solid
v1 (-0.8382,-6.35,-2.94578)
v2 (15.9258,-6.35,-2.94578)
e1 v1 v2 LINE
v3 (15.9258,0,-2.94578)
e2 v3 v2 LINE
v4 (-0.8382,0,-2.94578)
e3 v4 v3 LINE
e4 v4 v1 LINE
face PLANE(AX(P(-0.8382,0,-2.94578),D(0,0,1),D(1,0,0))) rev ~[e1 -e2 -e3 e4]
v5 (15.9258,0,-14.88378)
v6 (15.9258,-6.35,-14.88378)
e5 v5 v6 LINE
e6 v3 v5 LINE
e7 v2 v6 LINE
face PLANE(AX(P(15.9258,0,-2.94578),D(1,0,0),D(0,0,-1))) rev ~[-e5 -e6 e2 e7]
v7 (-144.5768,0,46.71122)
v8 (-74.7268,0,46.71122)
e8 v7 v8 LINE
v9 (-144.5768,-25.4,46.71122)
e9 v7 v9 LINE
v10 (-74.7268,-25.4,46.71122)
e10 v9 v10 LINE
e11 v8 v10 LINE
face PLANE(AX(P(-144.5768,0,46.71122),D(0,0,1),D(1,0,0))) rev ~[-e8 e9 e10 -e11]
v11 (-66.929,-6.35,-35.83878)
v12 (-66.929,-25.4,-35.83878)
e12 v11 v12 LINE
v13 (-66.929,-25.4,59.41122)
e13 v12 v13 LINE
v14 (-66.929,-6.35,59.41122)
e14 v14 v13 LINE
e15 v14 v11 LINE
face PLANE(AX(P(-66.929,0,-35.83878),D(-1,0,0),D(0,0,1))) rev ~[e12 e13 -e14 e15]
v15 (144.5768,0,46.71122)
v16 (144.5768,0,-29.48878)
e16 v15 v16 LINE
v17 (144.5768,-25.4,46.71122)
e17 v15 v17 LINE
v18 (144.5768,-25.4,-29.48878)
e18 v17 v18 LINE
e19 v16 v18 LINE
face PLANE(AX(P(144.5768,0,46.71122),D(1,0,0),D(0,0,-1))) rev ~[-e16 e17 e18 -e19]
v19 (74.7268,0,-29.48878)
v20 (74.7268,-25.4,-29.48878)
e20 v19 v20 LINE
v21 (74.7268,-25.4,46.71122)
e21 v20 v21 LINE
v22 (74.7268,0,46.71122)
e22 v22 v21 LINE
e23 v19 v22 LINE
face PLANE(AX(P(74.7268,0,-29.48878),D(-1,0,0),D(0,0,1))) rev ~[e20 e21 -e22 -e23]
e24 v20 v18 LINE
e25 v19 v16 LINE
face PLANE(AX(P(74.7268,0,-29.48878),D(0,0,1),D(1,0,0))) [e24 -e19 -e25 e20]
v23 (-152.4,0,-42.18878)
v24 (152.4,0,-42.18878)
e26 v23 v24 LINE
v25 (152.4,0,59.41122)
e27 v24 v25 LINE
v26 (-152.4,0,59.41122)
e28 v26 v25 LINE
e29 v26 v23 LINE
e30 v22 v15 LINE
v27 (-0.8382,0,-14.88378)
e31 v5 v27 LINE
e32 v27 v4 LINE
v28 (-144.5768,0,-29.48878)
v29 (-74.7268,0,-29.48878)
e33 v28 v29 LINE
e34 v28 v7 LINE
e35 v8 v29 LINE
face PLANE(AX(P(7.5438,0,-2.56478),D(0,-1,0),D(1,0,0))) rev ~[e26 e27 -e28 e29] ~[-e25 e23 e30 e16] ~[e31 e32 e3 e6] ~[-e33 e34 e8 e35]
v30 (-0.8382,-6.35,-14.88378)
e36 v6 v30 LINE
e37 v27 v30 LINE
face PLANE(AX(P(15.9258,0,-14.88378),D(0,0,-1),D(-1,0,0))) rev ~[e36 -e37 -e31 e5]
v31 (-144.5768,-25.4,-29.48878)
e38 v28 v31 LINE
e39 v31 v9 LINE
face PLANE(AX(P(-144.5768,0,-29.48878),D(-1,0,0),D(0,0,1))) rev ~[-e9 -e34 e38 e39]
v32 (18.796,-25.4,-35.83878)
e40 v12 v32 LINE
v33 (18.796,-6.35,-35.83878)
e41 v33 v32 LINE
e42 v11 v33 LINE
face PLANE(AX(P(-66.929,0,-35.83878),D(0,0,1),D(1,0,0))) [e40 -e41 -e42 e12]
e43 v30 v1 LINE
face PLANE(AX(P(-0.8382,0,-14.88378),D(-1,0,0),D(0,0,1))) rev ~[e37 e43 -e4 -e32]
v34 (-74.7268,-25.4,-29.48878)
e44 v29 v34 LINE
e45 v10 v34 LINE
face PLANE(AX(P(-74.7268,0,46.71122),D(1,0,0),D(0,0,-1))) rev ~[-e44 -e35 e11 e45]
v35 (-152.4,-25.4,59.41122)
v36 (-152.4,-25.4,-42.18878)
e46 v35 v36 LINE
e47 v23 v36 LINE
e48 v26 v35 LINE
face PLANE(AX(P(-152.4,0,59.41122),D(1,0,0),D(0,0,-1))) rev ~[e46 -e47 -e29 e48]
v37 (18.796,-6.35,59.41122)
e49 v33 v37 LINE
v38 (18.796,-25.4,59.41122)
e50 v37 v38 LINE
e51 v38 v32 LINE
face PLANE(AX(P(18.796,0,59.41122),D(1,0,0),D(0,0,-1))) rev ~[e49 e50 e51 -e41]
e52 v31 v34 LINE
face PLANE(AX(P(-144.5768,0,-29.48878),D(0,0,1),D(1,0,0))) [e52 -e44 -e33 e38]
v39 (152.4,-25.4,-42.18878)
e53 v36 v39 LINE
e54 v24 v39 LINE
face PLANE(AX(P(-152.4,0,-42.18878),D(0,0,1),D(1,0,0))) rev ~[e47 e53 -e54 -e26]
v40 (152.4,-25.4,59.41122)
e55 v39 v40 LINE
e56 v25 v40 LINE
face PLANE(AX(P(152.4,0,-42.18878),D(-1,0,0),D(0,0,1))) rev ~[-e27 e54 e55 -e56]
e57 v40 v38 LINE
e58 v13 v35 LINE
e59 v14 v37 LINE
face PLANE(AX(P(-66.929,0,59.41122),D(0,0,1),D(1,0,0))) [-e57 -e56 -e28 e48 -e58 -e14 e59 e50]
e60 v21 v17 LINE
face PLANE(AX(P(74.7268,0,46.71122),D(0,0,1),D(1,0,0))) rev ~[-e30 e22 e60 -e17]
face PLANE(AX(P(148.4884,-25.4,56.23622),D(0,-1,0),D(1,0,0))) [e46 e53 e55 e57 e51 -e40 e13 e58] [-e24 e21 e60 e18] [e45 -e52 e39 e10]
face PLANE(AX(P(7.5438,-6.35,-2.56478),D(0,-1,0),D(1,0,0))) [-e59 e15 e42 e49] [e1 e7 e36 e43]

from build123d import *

# Parameters (mm, degrees)
F0_W     = 7.8232
F0_H     = 6.35
F0_W_2   = 69.85
F0_W_3   = 55.9308
F0_H_2   = 76.2
F0_W_4   = 7.7978
F0_H_3   = 12.7
F0_W_5   = 85.725
F1_DEPTH = 25.4
F0_W_6   = 16.764
F0_H_4   = 0.762
F0_H_5   = 13.4315382606
F0_W_7   = 66.0908
F0_W_8   = 2.8702
F0_H_6   = 4.9097025247
F0_H_7   = 5.1918955931
F2_DEPTH = 6.35


with BuildPart() as f1:
    # F0 (on Front) → F1 (new body)
    with BuildSketch(Plane.XZ):
        with Locations((148.4884, 56.2362195122)):
            Rectangle(F0_W, F0_H)
        with Locations((109.6518, 56.2362195122)):
            Rectangle(F0_W_2, F0_H)
        with Locations((148.4884, 49.8862195122)):
            Rectangle(F0_W, F0_H)
        with Locations((46.7614, 56.2362195122)):
            Rectangle(F0_W_3, F0_H)
        with Locations((109.6518, 49.8862195122)):
            Rectangle(F0_W_2, F0_H)
        with Locations((148.4884, 8.6112195122)):
            Rectangle(F0_W, F0_H_2)
        with Locations((46.7614, 49.8862195122)):
            Rectangle(F0_W_3, F0_H)
        with Locations((148.4884, -32.6637804878)):
            Rectangle(F0_W, F0_H)
        with Locations((-70.8279, 56.2362195122)):
            Rectangle(F0_W_4, F0_H)
        Polygon((74.7268, -2.1837804878), (74.7268, 46.7112195122), (18.796, 46.7112195122), (18.796, 3.0081151053), (18.796, -2.1837804878), align=None)
        with Locations((109.6518, -32.6637804878)):
            Rectangle(F0_W_2, F0_H)
        with Locations((148.4884, -39.0137804878)):
            Rectangle(F0_W, F0_H)
        with Locations((-109.6518, 56.2362195122)):
            Rectangle(F0_W_2, F0_H)
        with Locations((-70.8279, 49.8862195122)):
            Rectangle(F0_W_4, F0_H)
        with Locations((46.7614, -8.5337804878)):
            Rectangle(F0_W_3, F0_H_3)
        with Locations((109.6518, -39.0137804878)):
            Rectangle(F0_W_2, F0_H)
        Polygon((18.796, -29.4887804878), (74.7268, -29.4887804878), (74.7268, -14.8837804878), (18.796, -14.8837804878), (18.796, -28.3153187484), align=None)
        with Locations((46.7614, -32.6637804878)):
            Rectangle(F0_W_3, F0_H)
        with Locations((-148.4884, 56.2362195122)):
            Rectangle(F0_W, F0_H)
        with Locations((-109.6518, 49.8862195122)):
            Rectangle(F0_W_2, F0_H)
        Polygon((-66.929, 2.7259220369), (-66.929, 46.7112195122), (-74.7268, 46.7112195122), (-74.7268, -2.1837804878), (-66.929, -2.1837804878), align=None)
        with Locations((46.7614, -39.0137804878)):
            Rectangle(F0_W_3, F0_H)
        with Locations((-148.4884, 49.8862195122)):
            Rectangle(F0_W, F0_H)
        with Locations((-24.0665, -39.0137804878)):
            Rectangle(F0_W_5, F0_H)
        Polygon((-74.7268, -29.4887804878), (-66.929, -29.4887804878), (-66.929, -28.3153187484), (-66.929, -14.8837804878), (-74.7268, -14.8837804878), align=None)
        with Locations((-70.8279, -32.6637804878)):
            Rectangle(F0_W_4, F0_H)
        with Locations((-148.4884, 8.6112195122)):
            Rectangle(F0_W, F0_H_2)
        with Locations((-70.8279, -8.5337804878)):
            Rectangle(F0_W_4, F0_H_3)
        with Locations((-70.8279, -39.0137804878)):
            Rectangle(F0_W_4, F0_H)
        with Locations((-109.6518, -32.6637804878)):
            Rectangle(F0_W_2, F0_H)
        with Locations((-148.4884, -32.6637804878)):
            Rectangle(F0_W, F0_H)
        with Locations((-109.6518, -39.0137804878)):
            Rectangle(F0_W_2, F0_H)
        with Locations((-148.4884, -39.0137804878)):
            Rectangle(F0_W, F0_H)
    extrude(amount=F1_DEPTH)

    # F0 (on Front) → F2 (join)
    with BuildSketch(Plane.XZ):
        with Locations((7.5438, -2.5647804878)):
            Rectangle(F0_W_6, F0_H_4)
        with Locations((7.5438, -21.5995496181)):
            Rectangle(F0_W_6, F0_H_5)
        Polygon((-66.929, -29.4887804878), (18.796, -29.4887804878), (18.796, -28.3153187484), (15.9258, -28.3153187484), (-0.8382, -28.3153187484), (-66.929, -28.3153187484), align=None)
        with Locations((-24.0665, -32.6637804878)):
            Rectangle(F0_W_5, F0_H)
        with Locations((-33.8836, -21.5995496181)):
            Rectangle(F0_W_7, F0_H_5)
        with Locations((17.3609, -21.5995496181)):
            Rectangle(F0_W_8, F0_H_5)
        Polygon((18.796, -14.8837804878), (18.796, -2.1837804878), (15.9258, -2.1837804878), (15.9258, -2.9457804878), (15.9258, -14.8837804878), align=None)
        Polygon((-0.8382, -2.1837804878), (-66.929, -2.1837804878), (-66.929, -14.8837804878), (-0.8382, -14.8837804878), (-0.8382, -2.9457804878), align=None)
        with Locations((-33.8836, 0.2710707746)):
            Rectangle(F0_W_7, F0_H_6)
        Polygon((15.9258, -2.1837804878), (15.9258, 3.0081151053), (-0.8382, 3.0081151053), (-0.8382, 2.7259220369), (-0.8382, -2.1837804878), align=None)
        with Locations((17.3609, 0.4121673088)):
            Rectangle(F0_W_8, F0_H_7)
        Polygon((18.796, 3.0081151053), (18.796, 46.7112195122), (-66.929, 46.7112195122), (-66.929, 2.7259220369), (-0.8382, 2.7259220369), (-0.8382, 3.0081151053), (15.9258, 3.0081151053), align=None)
        with Locations((-24.0665, 49.8862195122)):
            Rectangle(F0_W_5, F0_H)
        with Locations((-24.0665, 56.2362195122)):
            Rectangle(F0_W_5, F0_H)
    extrude(amount=F2_DEPTH)


solid = f1.part
